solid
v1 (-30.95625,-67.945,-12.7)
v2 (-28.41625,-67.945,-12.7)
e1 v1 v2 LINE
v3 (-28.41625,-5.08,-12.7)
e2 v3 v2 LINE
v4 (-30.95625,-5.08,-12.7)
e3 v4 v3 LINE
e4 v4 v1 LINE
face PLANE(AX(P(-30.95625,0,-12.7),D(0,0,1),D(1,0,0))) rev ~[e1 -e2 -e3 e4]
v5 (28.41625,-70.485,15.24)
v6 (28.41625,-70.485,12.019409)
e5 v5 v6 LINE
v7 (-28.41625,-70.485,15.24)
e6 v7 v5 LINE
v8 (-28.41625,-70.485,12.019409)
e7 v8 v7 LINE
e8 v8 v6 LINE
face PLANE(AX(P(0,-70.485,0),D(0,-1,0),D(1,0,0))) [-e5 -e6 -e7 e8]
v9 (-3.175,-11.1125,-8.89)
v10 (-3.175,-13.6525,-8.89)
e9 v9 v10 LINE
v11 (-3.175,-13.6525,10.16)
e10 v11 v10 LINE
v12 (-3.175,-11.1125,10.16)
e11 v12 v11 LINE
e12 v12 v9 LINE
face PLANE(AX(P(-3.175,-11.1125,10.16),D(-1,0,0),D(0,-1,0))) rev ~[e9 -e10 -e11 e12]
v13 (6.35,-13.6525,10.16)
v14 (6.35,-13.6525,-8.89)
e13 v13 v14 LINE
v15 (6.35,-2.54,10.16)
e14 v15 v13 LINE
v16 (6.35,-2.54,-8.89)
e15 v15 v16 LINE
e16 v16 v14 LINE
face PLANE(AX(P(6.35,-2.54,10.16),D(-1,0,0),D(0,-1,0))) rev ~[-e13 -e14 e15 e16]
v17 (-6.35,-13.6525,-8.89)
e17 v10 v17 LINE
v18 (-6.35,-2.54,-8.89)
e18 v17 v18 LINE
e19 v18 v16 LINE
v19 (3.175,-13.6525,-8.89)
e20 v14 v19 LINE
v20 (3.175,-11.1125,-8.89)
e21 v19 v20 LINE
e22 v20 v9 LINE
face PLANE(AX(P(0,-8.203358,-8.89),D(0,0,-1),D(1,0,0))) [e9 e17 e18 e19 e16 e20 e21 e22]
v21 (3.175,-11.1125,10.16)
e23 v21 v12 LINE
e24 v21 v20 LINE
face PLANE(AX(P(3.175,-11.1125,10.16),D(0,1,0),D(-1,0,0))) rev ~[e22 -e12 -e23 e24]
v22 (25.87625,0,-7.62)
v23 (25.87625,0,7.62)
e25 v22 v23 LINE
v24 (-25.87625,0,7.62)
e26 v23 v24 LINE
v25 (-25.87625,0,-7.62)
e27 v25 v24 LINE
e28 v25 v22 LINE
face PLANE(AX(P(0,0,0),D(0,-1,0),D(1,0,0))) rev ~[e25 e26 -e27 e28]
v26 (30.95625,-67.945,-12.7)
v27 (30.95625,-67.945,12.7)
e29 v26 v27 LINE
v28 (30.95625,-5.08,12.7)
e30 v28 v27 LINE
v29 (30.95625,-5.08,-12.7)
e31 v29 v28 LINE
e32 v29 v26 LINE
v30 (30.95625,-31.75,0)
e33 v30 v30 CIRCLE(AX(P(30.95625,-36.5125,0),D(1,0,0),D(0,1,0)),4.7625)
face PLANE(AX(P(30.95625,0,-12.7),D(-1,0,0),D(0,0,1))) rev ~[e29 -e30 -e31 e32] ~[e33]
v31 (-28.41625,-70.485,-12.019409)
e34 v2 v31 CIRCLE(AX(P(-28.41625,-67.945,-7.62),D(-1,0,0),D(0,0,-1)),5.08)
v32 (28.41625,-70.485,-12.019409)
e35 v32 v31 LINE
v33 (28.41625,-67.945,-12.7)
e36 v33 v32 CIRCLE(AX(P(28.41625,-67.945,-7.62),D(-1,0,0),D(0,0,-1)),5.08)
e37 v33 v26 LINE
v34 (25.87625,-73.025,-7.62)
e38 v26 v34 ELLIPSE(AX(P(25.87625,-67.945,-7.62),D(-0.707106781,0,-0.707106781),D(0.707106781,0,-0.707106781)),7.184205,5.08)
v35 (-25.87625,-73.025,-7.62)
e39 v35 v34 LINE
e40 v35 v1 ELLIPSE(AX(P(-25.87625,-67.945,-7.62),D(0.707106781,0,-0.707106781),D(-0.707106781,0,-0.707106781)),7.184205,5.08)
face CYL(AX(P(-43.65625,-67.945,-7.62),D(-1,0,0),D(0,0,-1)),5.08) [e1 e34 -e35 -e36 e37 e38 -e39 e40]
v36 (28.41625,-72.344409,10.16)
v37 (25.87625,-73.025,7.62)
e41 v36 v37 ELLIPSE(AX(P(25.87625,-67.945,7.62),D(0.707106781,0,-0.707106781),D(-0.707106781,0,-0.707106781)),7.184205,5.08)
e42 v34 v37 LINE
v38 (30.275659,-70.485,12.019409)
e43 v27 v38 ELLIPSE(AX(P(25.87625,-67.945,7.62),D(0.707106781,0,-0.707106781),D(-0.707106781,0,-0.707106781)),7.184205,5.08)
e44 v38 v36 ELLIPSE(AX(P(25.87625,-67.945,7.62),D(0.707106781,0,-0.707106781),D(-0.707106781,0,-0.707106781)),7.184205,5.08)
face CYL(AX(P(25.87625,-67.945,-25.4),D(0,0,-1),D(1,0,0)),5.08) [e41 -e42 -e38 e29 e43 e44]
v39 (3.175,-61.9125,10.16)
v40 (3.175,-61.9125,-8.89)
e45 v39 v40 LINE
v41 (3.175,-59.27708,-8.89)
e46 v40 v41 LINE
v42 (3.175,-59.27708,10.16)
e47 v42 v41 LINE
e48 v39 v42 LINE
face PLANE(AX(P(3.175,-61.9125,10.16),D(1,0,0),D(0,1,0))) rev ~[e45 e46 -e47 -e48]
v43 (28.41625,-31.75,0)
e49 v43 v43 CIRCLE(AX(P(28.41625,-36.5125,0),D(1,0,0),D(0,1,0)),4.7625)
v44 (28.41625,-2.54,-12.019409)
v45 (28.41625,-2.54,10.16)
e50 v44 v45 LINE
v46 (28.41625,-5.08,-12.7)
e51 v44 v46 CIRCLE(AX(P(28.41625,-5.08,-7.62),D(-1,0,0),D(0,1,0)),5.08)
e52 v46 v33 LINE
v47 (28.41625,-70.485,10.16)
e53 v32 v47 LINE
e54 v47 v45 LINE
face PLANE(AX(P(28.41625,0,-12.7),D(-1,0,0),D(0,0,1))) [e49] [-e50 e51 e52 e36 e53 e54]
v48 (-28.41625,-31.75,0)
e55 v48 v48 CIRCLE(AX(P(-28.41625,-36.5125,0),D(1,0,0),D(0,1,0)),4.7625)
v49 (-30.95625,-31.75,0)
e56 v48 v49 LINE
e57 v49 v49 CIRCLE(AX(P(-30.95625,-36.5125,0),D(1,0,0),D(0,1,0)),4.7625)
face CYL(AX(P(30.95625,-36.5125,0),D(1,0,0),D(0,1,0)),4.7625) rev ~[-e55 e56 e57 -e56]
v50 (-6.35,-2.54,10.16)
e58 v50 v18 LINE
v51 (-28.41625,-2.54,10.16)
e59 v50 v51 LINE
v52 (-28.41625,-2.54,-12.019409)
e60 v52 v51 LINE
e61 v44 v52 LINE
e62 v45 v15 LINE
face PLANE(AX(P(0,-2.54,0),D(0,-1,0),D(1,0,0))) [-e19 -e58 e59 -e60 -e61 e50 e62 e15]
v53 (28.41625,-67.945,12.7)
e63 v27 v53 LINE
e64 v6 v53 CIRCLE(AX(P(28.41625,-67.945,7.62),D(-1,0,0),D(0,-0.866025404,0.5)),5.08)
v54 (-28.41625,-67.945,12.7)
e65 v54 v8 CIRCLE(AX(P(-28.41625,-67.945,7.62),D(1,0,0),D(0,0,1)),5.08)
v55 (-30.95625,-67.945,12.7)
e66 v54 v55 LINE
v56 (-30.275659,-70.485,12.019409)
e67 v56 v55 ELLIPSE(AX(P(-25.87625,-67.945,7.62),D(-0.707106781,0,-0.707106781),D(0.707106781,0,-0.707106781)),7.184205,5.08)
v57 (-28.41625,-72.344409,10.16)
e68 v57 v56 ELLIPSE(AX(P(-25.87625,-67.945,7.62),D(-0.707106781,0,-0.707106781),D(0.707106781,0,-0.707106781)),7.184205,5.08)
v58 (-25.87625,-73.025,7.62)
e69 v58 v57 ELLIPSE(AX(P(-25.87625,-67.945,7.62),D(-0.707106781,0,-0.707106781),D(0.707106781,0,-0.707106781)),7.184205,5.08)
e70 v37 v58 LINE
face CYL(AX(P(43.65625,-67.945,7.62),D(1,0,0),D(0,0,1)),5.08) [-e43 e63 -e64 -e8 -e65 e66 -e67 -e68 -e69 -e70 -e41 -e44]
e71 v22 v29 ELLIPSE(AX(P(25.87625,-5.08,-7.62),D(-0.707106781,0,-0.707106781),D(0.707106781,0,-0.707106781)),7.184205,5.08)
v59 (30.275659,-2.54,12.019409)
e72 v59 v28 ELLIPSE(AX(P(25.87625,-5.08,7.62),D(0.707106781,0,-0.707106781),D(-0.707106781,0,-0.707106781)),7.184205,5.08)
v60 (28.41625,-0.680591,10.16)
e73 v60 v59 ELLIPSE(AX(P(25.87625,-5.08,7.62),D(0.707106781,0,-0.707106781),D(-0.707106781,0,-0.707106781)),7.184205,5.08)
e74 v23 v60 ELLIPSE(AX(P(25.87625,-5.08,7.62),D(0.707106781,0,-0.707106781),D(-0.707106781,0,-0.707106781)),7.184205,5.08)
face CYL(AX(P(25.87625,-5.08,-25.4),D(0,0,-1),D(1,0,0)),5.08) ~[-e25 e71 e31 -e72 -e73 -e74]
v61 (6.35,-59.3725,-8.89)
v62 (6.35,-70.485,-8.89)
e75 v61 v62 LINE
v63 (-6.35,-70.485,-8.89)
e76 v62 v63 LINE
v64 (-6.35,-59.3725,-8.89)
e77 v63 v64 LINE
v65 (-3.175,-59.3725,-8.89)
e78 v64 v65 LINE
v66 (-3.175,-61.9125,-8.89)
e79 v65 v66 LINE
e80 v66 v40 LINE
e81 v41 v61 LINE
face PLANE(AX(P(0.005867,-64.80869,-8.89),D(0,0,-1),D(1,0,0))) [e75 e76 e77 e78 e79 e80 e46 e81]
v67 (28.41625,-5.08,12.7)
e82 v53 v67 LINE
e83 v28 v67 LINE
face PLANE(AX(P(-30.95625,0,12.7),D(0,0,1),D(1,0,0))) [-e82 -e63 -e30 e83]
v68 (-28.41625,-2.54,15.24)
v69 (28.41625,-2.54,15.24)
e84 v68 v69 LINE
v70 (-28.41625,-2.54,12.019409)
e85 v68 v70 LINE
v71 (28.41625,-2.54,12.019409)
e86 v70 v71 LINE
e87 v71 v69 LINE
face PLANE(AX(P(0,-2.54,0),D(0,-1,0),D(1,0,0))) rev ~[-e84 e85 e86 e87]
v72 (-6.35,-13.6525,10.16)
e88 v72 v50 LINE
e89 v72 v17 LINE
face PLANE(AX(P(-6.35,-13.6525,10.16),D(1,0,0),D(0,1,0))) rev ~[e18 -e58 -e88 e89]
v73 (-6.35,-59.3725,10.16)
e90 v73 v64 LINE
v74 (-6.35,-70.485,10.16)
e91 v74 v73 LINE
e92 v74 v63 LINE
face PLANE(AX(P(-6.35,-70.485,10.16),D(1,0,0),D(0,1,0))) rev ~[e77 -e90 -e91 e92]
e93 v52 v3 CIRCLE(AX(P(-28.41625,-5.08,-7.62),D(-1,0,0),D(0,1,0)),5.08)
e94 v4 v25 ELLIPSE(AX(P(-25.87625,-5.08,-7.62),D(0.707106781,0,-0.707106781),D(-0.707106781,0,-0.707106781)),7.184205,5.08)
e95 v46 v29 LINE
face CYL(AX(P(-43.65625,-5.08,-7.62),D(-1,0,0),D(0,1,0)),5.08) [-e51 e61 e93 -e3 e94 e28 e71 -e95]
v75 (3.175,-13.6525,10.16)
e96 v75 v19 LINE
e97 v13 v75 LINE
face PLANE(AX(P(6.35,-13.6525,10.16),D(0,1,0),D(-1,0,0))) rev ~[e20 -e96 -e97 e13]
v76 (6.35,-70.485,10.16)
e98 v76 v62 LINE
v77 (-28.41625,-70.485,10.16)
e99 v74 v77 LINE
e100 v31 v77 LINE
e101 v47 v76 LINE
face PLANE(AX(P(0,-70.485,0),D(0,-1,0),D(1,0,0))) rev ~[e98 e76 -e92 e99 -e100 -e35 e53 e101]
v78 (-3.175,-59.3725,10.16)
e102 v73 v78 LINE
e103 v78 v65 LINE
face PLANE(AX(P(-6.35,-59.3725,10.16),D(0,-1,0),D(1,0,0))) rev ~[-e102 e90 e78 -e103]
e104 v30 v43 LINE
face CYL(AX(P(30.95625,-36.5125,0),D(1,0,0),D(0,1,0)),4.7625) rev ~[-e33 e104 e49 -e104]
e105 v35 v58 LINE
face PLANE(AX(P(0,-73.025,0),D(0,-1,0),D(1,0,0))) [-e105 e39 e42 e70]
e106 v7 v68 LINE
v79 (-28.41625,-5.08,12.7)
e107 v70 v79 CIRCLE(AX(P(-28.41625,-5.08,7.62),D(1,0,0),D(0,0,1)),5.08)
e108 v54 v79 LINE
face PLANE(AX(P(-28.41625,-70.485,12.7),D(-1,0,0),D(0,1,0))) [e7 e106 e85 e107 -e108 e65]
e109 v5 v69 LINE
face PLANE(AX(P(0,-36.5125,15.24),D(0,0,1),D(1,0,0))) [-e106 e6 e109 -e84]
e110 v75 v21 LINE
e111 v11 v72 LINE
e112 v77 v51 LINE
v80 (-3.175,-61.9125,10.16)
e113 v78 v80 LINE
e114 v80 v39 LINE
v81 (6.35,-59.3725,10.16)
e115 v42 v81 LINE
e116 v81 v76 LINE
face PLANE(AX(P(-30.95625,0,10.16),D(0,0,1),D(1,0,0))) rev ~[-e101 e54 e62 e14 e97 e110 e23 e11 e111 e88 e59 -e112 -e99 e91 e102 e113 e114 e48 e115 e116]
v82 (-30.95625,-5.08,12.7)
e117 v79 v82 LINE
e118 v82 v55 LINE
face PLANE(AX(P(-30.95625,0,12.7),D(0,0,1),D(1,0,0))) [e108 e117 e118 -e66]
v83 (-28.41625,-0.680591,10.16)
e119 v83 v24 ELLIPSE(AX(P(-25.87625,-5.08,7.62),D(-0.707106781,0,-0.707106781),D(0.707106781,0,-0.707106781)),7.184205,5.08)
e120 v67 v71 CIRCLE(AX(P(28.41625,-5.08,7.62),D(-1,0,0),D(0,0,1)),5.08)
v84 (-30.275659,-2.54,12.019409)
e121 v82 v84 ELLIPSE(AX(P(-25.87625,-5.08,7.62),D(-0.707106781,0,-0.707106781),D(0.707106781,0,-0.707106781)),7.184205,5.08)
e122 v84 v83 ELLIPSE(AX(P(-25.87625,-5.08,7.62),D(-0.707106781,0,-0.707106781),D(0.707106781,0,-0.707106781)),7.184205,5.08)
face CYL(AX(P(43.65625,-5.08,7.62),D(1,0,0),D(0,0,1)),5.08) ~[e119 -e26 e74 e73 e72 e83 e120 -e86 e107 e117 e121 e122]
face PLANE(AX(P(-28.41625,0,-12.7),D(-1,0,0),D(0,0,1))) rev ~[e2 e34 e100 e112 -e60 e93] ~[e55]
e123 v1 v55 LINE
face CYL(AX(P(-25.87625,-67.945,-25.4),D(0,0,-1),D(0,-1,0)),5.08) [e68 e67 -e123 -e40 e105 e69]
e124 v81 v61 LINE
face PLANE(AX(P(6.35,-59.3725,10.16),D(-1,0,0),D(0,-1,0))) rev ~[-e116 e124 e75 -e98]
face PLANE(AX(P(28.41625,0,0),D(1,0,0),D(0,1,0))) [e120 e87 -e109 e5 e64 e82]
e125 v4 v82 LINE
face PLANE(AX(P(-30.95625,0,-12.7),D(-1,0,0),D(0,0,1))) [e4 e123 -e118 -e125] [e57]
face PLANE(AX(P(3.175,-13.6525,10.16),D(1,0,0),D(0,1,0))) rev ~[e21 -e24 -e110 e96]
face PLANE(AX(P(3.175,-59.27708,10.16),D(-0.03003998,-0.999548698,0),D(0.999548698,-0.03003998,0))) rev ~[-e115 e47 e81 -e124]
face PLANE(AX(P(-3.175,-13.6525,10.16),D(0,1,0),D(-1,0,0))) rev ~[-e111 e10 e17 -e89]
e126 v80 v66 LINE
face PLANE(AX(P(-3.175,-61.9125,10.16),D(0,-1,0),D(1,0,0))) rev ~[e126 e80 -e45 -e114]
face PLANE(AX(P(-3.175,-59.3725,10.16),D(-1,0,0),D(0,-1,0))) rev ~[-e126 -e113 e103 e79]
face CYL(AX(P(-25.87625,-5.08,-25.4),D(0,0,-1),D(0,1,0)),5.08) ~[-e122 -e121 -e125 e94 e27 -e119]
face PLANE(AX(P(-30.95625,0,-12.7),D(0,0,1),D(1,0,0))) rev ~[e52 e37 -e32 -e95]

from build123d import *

# Parameters (mm, degrees)
F0_W         = 61.9125
F0_H         = 25.4
F1_DEPTH     = 73.025
F3_T         = -2.54
F4_W         = 56.8325
F4_H         = 67.945
F5_DEPTH     = 2.54
F6_T1_DEPTH  = 50.8
F6_T3_DEPTH  = 87.3125
F6_T8_DEPTH  = 87.3125
F6_T14_DEPTH = 87.3125
F6_T20_DEPTH = 87.3125
F6_T27_DEPTH = 87.3125
F6_T33_DEPTH = 87.3125
F7_T1_DEPTH  = 50.8
F7_T3_DEPTH  = 87.3125
F7_T8_DEPTH  = 87.3125
F7_T14_DEPTH = 87.3125
F7_T20_DEPTH = 87.3125
F7_T27_DEPTH = 87.3125
F7_T33_DEPTH = 87.3125
F2_R         = 4.7625
F8_DEPTH     = 61.9135
F10_DEPTH    = 19.05


# Not quite as in the source:
# - a fillet or chamfer that OpenCascade refuses, or shapes differently, is made with other operations: its cross-section is extruded or revolved along the edge and cut away or added


with BuildPart() as f1:
    # F0 (on Front) → F1 (new body)
    with BuildSketch(Plane.XZ):
        Rectangle(F0_W, F0_H)
    extrude(amount=F1_DEPTH)

    # F3
    f3_openings = [f1.faces().sort_by_distance(p)[0] for p in [
        (0, -36.5125, -12.7),
    ]]
    offset(amount=F3_T, openings=f3_openings)

    # F4 (on face) → F5 (join)
    with BuildSketch(Plane.XY.offset(12.7)):
        with Locations((0, -36.5125)):
            Rectangle(F4_W, F4_H)
    extrude(amount=F5_DEPTH)

    # F6: fillet of radius 5.08 on 4 edges, made by hand

    # F6_s2 → F6_t1 (cut)
    with BuildSketch(Plane.XY.offset(-25.4)):
        with BuildLine():
            ThreePointArc((-25.87625, 0), (-29.4683524484, -1.4878975516), (-30.95625, -5.08))
            Line((-30.95625, -5.08), (-30.95625, 0))
            Line((-30.95625, 0), (-25.87625, 0))
        make_face()
        with BuildLine():
            ThreePointArc((30.95625, -5.08), (29.4683524484, -1.4878975516), (25.87625, 0))
            Line((25.87625, 0), (30.95625, 0))
            Line((30.95625, 0), (30.95625, -5.08))
        make_face()
    extrude(amount=F6_T1_DEPTH, mode=Mode.SUBTRACT)

    # F6_s4 → F6_t3 (cut)
    with BuildSketch(Plane.YZ.offset(-43.65625)):
        with BuildLine():
            ThreePointArc((0, -7.62), (-1.4878975516, -11.2121024484), (-5.08, -12.7))
            Line((-5.08, -12.7), (0, -12.7))
            Line((0, -12.7), (0, -7.62))
        make_face()
    extrude(amount=F6_T3_DEPTH, mode=Mode.SUBTRACT)


with BuildPart() as f6_tool6:
    # F6_s7 → F6_t8 (new body)
    with BuildSketch(Plane.YZ.offset(43.65625)):
        with BuildLine():
            ThreePointArc((-5.08, 12.7), (-1.4878975516, 11.2121024484), (0, 7.62))
            Line((0, 7.62), (0, 12.7))
            Line((0, 12.7), (-5.08, 12.7))
        make_face()
    extrude(amount=-F6_T8_DEPTH)

    split(bisect_by=Plane.XZ.offset(2.54), keep=Keep.TOP)

    split(bisect_by=Plane.YZ.offset(28.41625), keep=Keep.TOP)


with BuildPart() as f1_1:
    add(f1.part)

    # F6_t5: cut F6_tool6
    add(f6_tool6.part, mode=Mode.SUBTRACT)


with BuildPart() as f6_tool12:
    # F6_s13 → F6_t14 (new body)
    with BuildSketch(Plane.YZ.offset(43.65625)):
        with BuildLine():
            ThreePointArc((-5.08, 12.7), (-1.4878975516, 11.2121024484), (0, 7.62))
            Line((0, 7.62), (0, 12.7))
            Line((0, 12.7), (-5.08, 12.7))
        make_face()
    extrude(amount=-F6_T14_DEPTH)

    split(bisect_by=Plane.XZ.offset(2.54), keep=Keep.BOTTOM)

    split(bisect_by=Plane.YZ.offset(28.41625), keep=Keep.TOP)


with BuildPart() as f1_2:
    add(f1_1.part)

    # F6_t11: cut F6_tool12
    add(f6_tool12.part, mode=Mode.SUBTRACT)


with BuildPart() as f6_tool18:
    # F6_s19 → F6_t20 (new body)
    with BuildSketch(Plane.YZ.offset(43.65625)):
        with BuildLine():
            ThreePointArc((-5.08, 12.7), (-1.4878975516, 11.2121024484), (0, 7.62))
            Line((0, 7.62), (0, 12.7))
            Line((0, 12.7), (-5.08, 12.7))
        make_face()
    extrude(amount=-F6_T20_DEPTH)

    split(bisect_by=Plane.YZ.offset(-28.41625), keep=Keep.TOP)

    split(bisect_by=Plane.XZ.offset(2.54), keep=Keep.BOTTOM)

    split(bisect_by=Plane.YZ.offset(28.41625), keep=Keep.BOTTOM)


with BuildPart() as f1_3:
    add(f1_2.part)

    # F6_t17: cut F6_tool18
    add(f6_tool18.part, mode=Mode.SUBTRACT)


with BuildPart() as f6_tool25:
    # F6_s26 → F6_t27 (new body)
    with BuildSketch(Plane.YZ.offset(43.65625)):
        with BuildLine():
            ThreePointArc((-5.08, 12.7), (-1.4878975516, 11.2121024484), (0, 7.62))
            Line((0, 7.62), (0, 12.7))
            Line((0, 12.7), (-5.08, 12.7))
        make_face()
    extrude(amount=-F6_T27_DEPTH)

    split(bisect_by=Plane.YZ.offset(-28.41625), keep=Keep.BOTTOM)

    split(bisect_by=Plane.XZ.offset(2.54), keep=Keep.TOP)


with BuildPart() as f1_4:
    add(f1_3.part)

    # F6_t24: cut F6_tool25
    add(f6_tool25.part, mode=Mode.SUBTRACT)


with BuildPart() as f6_tool31:
    # F6_s32 → F6_t33 (new body)
    with BuildSketch(Plane.YZ.offset(43.65625)):
        with BuildLine():
            ThreePointArc((-5.08, 12.7), (-1.4878975516, 11.2121024484), (0, 7.62))
            Line((0, 7.62), (0, 12.7))
            Line((0, 12.7), (-5.08, 12.7))
        make_face()
    extrude(amount=-F6_T33_DEPTH)

    split(bisect_by=Plane.YZ.offset(-28.41625), keep=Keep.BOTTOM)

    split(bisect_by=Plane.XZ.offset(2.54), keep=Keep.BOTTOM)


with BuildPart() as f1_5:
    add(f1_4.part)

    # F6_t30: cut F6_tool31
    add(f6_tool31.part, mode=Mode.SUBTRACT)

    # F7: fillet of radius 5.08 on 4 edges, made by hand

    # F7_s2 → F7_t1 (cut)
    with BuildSketch(Plane.XY.offset(-25.4)):
        with BuildLine():
            ThreePointArc((-25.87625, -73.025), (-29.4683524484, -71.5371024484), (-30.95625, -67.945))
            Line((-30.95625, -67.945), (-30.95625, -73.025))
            Line((-30.95625, -73.025), (-25.87625, -73.025))
        make_face()
        with BuildLine():
            ThreePointArc((30.95625, -67.945), (29.4683524484, -71.5371024484), (25.87625, -73.025))
            Line((25.87625, -73.025), (30.95625, -73.025))
            Line((30.95625, -73.025), (30.95625, -67.945))
        make_face()
    extrude(amount=F7_T1_DEPTH, mode=Mode.SUBTRACT)

    # F7_s4 → F7_t3 (cut)
    with BuildSketch(Plane.YZ.offset(-43.65625)):
        with BuildLine():
            ThreePointArc((-67.945, -12.7), (-71.5371024484, -11.2121024484), (-73.025, -7.62))
            Line((-73.025, -7.62), (-73.025, -12.7))
            Line((-73.025, -12.7), (-67.945, -12.7))
        make_face()
    extrude(amount=F7_T3_DEPTH, mode=Mode.SUBTRACT)


with BuildPart() as f7_tool6:
    # F7_s7 → F7_t8 (new body)
    with BuildSketch(Plane.YZ.offset(43.65625)):
        with BuildLine():
            ThreePointArc((-67.945, 12.7), (-71.5371024484, 11.2121024484), (-73.025, 7.62))
            Line((-73.025, 7.62), (-73.025, 12.7))
            Line((-73.025, 12.7), (-67.945, 12.7))
        make_face()
    extrude(amount=-F7_T8_DEPTH)

    split(bisect_by=Plane.YZ.offset(28.41625), keep=Keep.TOP)

    split(bisect_by=Plane.XZ.offset(70.485), keep=Keep.BOTTOM)


with BuildPart() as f1_6:
    add(f1_5.part)

    # F7_t5: cut F7_tool6
    add(f7_tool6.part, mode=Mode.SUBTRACT)


with BuildPart() as f7_tool12:
    # F7_s13 → F7_t14 (new body)
    with BuildSketch(Plane.YZ.offset(43.65625)):
        with BuildLine():
            ThreePointArc((-67.945, 12.7), (-71.5371024484, 11.2121024484), (-73.025, 7.62))
            Line((-73.025, 7.62), (-73.025, 12.7))
            Line((-73.025, 12.7), (-67.945, 12.7))
        make_face()
    extrude(amount=-F7_T14_DEPTH)

    split(bisect_by=Plane.YZ.offset(28.41625), keep=Keep.TOP)

    split(bisect_by=Plane.XZ.offset(70.485), keep=Keep.TOP)


with BuildPart() as f1_7:
    add(f1_6.part)

    # F7_t11: cut F7_tool12
    add(f7_tool12.part, mode=Mode.SUBTRACT)


with BuildPart() as f7_tool18:
    # F7_s19 → F7_t20 (new body)
    with BuildSketch(Plane.YZ.offset(43.65625)):
        with BuildLine():
            ThreePointArc((-67.945, 12.7), (-71.5371024484, 11.2121024484), (-73.025, 7.62))
            Line((-73.025, 7.62), (-73.025, 12.7))
            Line((-73.025, 12.7), (-67.945, 12.7))
        make_face()
    extrude(amount=-F7_T20_DEPTH)

    split(bisect_by=Plane.YZ.offset(28.41625), keep=Keep.BOTTOM)

    split(bisect_by=Plane.XZ.offset(70.485), keep=Keep.TOP)

    split(bisect_by=Plane.YZ.offset(-28.41625), keep=Keep.TOP)


with BuildPart() as f1_8:
    add(f1_7.part)

    # F7_t17: cut F7_tool18
    add(f7_tool18.part, mode=Mode.SUBTRACT)


with BuildPart() as f7_tool25:
    # F7_s26 → F7_t27 (new body)
    with BuildSketch(Plane.YZ.offset(43.65625)):
        with BuildLine():
            ThreePointArc((-67.945, 12.7), (-71.5371024484, 11.2121024484), (-73.025, 7.62))
            Line((-73.025, 7.62), (-73.025, 12.7))
            Line((-73.025, 12.7), (-67.945, 12.7))
        make_face()
    extrude(amount=-F7_T27_DEPTH)

    split(bisect_by=Plane.XZ.offset(70.485), keep=Keep.BOTTOM)

    split(bisect_by=Plane.YZ.offset(-28.41625), keep=Keep.BOTTOM)


with BuildPart() as f1_9:
    add(f1_8.part)

    # F7_t24: cut F7_tool25
    add(f7_tool25.part, mode=Mode.SUBTRACT)


with BuildPart() as f7_tool31:
    # F7_s32 → F7_t33 (new body)
    with BuildSketch(Plane.YZ.offset(43.65625)):
        with BuildLine():
            ThreePointArc((-67.945, 12.7), (-71.5371024484, 11.2121024484), (-73.025, 7.62))
            Line((-73.025, 7.62), (-73.025, 12.7))
            Line((-73.025, 12.7), (-67.945, 12.7))
        make_face()
    extrude(amount=-F7_T33_DEPTH)

    split(bisect_by=Plane.XZ.offset(70.485), keep=Keep.TOP)

    split(bisect_by=Plane.YZ.offset(-28.41625), keep=Keep.BOTTOM)


with BuildPart() as f1_10:
    add(f1_9.part)

    # F7_t30: cut F7_tool31
    add(f7_tool31.part, mode=Mode.SUBTRACT)

    # F2 (on face) → F8 (cut, through all)
    with BuildSketch(Plane.YZ.offset(30.95625)):
        with Locations((-36.5125, 0)):
            Circle(F2_R)
    extrude(amount=-F8_DEPTH, mode=Mode.SUBTRACT)

    # F9 (on face) → F10 (join)
    with BuildSketch(Plane(origin=(0, 0, 10.16), x_dir=(1, 0, 0), z_dir=(0, 0, -1))):
        Polygon((-3.175, 61.9125), (3.175, 61.9125), (3.175, 59.2770799994), (6.35, 59.3725), (6.35, 61.9125), (6.35, 70.485), (0, 70.485), (-6.35, 70.485), (-6.35, 61.9125), (-6.35, 59.3725), (-3.175, 59.3725), align=None)
        Polygon((3.175, 13.6525), (3.175, 11.1125), (-3.175, 11.1125), (-3.175, 13.6525), (-6.35, 13.6525), (-6.35, 11.1125), (-6.35, 2.54), (6.35, 2.54), (6.35, 11.1125), (6.35, 13.6525), align=None)
    extrude(amount=F10_DEPTH)


solid = f1_10.part
